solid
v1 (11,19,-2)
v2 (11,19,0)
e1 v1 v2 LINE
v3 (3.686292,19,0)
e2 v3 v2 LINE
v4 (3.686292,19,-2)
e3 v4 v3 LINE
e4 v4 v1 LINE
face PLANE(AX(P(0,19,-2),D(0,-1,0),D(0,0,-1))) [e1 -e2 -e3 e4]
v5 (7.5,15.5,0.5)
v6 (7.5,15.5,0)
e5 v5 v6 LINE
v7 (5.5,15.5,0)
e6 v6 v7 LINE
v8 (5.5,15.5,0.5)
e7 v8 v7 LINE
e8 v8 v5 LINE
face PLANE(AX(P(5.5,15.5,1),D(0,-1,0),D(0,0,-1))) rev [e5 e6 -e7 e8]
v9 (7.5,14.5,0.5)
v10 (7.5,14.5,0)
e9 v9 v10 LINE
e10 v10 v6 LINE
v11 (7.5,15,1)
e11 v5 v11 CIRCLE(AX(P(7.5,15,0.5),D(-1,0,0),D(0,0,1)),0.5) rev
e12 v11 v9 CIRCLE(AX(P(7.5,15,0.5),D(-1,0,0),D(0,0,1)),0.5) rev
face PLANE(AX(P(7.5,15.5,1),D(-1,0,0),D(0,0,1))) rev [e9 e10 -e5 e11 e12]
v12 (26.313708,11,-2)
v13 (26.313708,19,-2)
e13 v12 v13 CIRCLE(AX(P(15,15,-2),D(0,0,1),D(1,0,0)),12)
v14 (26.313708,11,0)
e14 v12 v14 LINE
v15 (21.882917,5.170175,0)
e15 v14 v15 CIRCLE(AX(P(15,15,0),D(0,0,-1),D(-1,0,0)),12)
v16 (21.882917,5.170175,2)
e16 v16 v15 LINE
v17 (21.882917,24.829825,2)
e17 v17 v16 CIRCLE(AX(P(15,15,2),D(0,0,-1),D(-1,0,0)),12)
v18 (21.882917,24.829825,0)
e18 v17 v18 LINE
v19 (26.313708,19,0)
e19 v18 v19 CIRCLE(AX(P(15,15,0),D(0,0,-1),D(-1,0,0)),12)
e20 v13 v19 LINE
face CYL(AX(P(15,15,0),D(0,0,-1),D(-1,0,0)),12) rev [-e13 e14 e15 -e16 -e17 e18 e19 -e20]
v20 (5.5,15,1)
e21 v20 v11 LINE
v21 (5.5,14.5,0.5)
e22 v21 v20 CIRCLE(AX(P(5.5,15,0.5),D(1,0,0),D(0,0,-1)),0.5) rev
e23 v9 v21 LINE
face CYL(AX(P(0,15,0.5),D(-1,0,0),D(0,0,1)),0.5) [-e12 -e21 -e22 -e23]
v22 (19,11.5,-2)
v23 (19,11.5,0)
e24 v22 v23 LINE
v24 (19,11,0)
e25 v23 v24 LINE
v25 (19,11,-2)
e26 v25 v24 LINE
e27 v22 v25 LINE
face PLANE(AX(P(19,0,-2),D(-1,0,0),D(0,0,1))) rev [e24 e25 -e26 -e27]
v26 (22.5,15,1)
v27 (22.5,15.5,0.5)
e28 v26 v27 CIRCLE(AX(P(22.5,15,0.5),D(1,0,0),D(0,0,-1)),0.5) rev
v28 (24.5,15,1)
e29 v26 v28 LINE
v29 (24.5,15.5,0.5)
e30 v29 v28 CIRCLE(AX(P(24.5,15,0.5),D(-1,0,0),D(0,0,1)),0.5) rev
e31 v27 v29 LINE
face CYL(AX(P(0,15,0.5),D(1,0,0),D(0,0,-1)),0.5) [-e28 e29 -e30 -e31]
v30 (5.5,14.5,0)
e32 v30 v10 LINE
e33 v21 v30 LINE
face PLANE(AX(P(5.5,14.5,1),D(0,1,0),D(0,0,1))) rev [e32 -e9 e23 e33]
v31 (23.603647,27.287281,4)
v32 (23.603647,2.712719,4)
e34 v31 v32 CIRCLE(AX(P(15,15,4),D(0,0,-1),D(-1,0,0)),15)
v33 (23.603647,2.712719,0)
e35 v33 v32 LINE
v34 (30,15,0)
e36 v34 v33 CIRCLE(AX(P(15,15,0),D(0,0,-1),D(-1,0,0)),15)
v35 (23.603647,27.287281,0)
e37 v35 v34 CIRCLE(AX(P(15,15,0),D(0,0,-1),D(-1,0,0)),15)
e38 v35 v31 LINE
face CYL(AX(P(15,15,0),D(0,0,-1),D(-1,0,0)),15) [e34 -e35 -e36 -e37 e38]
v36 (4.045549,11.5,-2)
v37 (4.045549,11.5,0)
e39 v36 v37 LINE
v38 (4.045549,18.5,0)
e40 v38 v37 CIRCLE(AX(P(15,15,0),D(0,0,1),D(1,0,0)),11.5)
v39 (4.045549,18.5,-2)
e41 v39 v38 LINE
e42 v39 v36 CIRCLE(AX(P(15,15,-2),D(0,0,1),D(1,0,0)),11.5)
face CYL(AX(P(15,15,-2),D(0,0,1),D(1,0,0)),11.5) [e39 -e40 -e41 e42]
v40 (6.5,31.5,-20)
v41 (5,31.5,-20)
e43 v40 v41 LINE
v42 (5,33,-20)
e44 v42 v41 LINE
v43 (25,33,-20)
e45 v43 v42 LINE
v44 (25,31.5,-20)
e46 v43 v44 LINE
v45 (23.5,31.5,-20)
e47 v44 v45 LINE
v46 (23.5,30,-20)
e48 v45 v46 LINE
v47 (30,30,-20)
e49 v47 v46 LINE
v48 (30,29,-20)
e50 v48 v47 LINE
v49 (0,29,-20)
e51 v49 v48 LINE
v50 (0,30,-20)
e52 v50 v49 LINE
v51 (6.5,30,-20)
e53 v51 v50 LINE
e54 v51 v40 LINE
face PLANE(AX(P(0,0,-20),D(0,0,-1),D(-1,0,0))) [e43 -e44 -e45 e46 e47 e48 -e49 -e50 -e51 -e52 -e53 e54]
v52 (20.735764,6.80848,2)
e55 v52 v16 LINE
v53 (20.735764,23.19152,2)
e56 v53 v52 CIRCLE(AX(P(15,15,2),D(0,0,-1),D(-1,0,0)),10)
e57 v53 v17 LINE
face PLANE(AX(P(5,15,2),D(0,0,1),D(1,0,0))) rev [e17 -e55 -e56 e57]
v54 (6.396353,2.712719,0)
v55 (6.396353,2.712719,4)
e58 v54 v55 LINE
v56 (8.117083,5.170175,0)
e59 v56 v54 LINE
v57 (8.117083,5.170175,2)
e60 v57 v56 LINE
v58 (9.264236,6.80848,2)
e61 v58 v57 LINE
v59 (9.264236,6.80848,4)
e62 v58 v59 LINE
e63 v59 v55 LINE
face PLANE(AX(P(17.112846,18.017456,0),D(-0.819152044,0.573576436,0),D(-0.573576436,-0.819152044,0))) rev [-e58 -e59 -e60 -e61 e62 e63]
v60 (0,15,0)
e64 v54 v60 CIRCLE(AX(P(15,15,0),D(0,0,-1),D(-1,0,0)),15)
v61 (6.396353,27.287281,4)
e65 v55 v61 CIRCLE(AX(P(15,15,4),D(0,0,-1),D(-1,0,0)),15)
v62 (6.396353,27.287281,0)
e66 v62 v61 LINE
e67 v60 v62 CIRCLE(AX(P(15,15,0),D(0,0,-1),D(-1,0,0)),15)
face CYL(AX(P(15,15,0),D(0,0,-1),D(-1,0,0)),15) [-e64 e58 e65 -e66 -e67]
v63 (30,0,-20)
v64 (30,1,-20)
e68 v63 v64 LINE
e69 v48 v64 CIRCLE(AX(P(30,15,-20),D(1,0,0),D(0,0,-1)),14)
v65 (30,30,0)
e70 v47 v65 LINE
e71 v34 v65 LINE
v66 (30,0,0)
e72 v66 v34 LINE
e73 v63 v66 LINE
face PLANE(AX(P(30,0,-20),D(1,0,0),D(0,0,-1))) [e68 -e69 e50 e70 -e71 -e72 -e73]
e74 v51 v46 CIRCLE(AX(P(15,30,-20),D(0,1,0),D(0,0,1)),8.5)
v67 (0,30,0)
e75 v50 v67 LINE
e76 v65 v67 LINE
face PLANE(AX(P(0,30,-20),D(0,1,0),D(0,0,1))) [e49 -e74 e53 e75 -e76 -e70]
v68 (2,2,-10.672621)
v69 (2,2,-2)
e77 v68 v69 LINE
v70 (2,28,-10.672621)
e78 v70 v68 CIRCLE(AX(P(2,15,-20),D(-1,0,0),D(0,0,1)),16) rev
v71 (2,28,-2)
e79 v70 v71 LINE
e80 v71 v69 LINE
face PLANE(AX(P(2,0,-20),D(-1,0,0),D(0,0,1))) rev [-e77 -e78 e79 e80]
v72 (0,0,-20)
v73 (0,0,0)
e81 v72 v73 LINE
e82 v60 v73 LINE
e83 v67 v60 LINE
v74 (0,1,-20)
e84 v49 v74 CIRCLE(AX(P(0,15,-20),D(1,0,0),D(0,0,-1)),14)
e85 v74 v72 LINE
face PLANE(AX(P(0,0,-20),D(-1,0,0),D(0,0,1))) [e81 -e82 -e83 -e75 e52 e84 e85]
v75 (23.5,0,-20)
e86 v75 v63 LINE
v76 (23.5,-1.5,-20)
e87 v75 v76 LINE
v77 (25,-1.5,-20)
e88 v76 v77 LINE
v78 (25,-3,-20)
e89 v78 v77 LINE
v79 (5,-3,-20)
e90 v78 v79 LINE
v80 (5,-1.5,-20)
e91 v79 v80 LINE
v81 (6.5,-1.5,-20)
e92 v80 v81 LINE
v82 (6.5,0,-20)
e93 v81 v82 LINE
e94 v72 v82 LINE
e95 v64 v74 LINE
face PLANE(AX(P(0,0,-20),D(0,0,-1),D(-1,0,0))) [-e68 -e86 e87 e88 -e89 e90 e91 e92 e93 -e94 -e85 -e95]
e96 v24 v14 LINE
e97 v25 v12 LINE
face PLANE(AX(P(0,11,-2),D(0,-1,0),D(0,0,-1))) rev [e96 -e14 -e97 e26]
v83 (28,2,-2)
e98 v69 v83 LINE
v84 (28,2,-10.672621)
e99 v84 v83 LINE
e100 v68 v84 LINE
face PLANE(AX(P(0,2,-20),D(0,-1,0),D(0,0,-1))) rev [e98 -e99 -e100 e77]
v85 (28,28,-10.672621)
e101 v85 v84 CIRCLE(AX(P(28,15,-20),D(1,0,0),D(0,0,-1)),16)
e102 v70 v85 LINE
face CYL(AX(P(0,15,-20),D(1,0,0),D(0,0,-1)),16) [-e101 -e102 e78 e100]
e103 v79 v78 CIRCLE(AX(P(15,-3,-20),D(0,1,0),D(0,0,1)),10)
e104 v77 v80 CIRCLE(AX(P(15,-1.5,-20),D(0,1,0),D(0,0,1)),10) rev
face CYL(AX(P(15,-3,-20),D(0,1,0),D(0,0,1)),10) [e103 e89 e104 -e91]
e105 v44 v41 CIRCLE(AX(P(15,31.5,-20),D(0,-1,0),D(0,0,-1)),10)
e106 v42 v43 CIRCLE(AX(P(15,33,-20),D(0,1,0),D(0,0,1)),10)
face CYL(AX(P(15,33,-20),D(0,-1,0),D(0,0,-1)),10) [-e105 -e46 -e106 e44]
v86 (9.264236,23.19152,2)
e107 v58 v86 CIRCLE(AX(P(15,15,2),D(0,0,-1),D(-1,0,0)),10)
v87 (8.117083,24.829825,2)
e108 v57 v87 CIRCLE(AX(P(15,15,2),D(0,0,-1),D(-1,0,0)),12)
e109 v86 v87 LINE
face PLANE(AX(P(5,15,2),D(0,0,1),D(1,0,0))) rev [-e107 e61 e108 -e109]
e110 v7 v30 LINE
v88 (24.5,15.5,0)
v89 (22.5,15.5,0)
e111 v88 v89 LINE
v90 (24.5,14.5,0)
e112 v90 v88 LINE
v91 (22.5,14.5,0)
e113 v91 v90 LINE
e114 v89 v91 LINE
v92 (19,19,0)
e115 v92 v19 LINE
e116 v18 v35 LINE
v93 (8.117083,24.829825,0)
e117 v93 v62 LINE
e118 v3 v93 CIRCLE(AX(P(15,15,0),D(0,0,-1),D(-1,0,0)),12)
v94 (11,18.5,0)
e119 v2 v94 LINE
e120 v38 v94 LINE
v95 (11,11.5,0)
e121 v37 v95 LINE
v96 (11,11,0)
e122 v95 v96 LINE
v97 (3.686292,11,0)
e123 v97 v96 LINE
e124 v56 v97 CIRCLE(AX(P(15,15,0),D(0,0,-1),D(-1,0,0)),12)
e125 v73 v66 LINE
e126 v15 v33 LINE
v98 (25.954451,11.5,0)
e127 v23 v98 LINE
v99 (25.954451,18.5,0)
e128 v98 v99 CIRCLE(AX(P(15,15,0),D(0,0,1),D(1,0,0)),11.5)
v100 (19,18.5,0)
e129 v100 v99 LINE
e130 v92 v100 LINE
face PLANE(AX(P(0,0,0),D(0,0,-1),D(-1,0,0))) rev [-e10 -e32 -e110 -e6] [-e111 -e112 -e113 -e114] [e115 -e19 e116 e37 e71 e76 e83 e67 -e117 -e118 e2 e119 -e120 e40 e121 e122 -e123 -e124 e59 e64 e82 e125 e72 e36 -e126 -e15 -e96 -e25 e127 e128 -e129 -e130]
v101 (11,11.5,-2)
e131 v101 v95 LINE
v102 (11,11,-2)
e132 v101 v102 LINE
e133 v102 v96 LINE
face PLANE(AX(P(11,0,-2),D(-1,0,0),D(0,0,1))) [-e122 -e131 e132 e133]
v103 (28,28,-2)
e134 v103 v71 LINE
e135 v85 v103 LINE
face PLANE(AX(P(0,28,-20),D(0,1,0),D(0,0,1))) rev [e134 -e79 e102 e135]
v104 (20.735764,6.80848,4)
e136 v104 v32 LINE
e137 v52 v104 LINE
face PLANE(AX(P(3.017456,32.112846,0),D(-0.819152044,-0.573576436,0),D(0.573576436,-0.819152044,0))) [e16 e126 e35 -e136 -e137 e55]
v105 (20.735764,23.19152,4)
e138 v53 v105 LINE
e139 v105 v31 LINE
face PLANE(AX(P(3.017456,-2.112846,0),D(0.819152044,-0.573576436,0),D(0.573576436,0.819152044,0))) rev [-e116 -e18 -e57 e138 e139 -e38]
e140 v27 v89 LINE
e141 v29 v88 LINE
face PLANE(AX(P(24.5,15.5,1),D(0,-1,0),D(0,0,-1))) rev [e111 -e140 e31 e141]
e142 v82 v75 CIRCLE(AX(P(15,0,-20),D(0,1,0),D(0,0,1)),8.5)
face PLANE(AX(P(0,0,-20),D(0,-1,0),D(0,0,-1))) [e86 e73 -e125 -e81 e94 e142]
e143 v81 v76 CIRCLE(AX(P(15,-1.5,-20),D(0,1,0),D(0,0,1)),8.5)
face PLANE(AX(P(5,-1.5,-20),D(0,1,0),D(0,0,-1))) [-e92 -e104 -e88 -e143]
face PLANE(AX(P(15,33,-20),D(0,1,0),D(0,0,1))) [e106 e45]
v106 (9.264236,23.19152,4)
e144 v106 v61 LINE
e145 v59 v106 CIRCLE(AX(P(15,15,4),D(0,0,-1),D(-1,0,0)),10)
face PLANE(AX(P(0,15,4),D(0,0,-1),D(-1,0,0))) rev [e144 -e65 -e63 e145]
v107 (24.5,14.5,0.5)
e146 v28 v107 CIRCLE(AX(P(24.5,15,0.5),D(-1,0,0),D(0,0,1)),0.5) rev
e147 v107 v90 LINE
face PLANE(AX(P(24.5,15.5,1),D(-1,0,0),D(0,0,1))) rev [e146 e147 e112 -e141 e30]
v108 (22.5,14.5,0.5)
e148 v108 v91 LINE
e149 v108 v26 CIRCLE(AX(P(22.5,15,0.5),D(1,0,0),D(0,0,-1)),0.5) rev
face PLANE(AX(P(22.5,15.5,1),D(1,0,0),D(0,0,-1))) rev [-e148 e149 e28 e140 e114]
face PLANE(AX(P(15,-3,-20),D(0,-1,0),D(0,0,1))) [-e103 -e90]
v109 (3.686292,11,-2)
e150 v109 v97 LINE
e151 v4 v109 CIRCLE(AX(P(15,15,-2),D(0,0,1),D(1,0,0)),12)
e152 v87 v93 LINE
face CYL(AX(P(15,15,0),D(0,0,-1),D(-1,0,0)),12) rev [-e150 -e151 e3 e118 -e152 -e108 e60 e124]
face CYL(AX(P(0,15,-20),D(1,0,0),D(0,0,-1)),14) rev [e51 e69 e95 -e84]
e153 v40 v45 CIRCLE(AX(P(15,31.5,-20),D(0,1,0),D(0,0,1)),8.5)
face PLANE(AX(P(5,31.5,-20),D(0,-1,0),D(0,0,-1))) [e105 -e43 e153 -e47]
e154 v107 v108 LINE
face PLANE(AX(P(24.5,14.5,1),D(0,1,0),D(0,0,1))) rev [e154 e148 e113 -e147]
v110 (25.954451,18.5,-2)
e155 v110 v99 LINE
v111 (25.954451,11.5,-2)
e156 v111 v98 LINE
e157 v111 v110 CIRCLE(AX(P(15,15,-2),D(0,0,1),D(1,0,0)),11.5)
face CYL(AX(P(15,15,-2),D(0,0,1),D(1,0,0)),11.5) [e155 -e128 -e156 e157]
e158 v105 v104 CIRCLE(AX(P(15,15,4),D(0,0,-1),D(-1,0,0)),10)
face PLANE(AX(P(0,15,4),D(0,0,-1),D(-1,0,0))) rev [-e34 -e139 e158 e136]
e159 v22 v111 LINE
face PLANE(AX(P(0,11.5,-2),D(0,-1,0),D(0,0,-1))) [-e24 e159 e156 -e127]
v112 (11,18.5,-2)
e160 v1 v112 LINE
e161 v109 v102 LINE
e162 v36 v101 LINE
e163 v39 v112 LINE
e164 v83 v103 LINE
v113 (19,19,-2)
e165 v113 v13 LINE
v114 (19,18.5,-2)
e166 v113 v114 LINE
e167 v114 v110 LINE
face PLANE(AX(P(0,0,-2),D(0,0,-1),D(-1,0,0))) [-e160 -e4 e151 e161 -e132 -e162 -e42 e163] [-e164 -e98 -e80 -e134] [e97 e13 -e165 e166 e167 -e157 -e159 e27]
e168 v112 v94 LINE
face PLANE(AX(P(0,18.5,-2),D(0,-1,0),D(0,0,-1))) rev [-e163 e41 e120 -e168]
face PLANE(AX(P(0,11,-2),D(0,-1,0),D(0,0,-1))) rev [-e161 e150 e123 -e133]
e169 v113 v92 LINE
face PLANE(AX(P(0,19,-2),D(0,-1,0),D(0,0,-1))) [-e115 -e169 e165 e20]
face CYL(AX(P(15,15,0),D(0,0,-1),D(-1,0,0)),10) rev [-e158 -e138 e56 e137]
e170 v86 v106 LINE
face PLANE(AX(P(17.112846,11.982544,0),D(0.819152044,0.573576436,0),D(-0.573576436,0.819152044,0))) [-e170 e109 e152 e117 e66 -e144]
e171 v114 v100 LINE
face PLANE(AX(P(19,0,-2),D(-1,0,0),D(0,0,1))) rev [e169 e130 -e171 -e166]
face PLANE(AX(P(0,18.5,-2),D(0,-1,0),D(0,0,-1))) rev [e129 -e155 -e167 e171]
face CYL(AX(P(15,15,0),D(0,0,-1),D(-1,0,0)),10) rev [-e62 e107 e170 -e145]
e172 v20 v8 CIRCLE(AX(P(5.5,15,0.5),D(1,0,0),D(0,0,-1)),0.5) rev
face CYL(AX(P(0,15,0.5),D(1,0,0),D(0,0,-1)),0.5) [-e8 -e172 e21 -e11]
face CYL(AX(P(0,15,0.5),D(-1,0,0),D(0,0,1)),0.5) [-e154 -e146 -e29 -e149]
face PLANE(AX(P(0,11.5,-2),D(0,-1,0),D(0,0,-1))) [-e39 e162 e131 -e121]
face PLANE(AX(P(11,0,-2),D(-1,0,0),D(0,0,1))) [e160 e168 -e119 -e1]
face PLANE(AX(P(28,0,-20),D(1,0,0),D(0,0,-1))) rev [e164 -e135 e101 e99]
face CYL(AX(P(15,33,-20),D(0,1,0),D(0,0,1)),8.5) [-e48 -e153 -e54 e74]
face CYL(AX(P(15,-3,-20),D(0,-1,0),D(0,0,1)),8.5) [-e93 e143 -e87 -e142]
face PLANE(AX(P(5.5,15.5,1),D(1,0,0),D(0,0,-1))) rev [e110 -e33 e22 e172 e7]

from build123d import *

# Parameters (mm, degrees)
SKETCH4_W           = 30
SKETCH4_H           = 30
BOSS_EXTRUDE2_DEPTH = 20
SKETCH5_R           = 14
CUT_EXTRUDE1_DEPTH  = 47.904157598
SKETCH6_W           = 2
SKETCH6_H           = 1
BOSS_EXTRUDE3_DEPTH = 1
SHELL6_START        = 2
SHELL6_DEPTH        = 26
FILLET1_R           = 0.5
CUT_EXTRUDE2_DEPTH  = 4
CUT_EXTRUDE11_START = -2
CUT_EXTRUDE11_DEPTH = 2
BOSS_EXTRUDE4_DEPTH = 3
SKETCH12_W          = 1.5
SKETCH12_H          = 1.5


# Read off the part's stored shape, not the designer's step: Shell6
with BuildPart() as part:
    # Sketch4 → Boss-Extrude2 (new body)
    with BuildSketch(Plane.XY):
        with Locations((15, 15)):
            Rectangle(SKETCH4_W, SKETCH4_H)
    extrude(amount=-BOSS_EXTRUDE2_DEPTH)

    # Sketch5 → Cut-Extrude1 (cut, through all)
    with BuildSketch(Plane(origin=(30, 0, 0), x_dir=(0, 0, -1), z_dir=(1, 0, 0))):
        with Locations((20, 15)):
            Circle(SKETCH5_R)
    extrude(amount=-CUT_EXTRUDE1_DEPTH, mode=Mode.SUBTRACT)

    # Sketch6 → Boss-Extrude3 (add)
    with BuildSketch(Plane.XY):
        with Locations((23.5, 15)):
            Rectangle(SKETCH6_W, SKETCH6_H)
        with Locations((6.5, 15)):
            Rectangle(SKETCH6_W, SKETCH6_H)
    extrude(amount=BOSS_EXTRUDE3_DEPTH)

    # Shell6 outline → Shell6 (cut)
    with BuildSketch(Plane.YZ.offset(SHELL6_START)):
        with BuildLine():
            Line((28, -2), (2, -2))
            Line((2, -2), (2, -10.672620947))
            ThreePointArc((2, -10.672620947), (15, -4), (28, -10.672620947))
            Line((28, -10.672620947), (28, -2))
        make_face()
    extrude(amount=SHELL6_DEPTH, mode=Mode.SUBTRACT)

    # Fillet1
    fillet1_edges = [part.edges().sort_by_distance(p)[0] for p in [
        (23.5, 15.5, 1),
        (23.5, 14.5, 1),
        (6.5, 15.5, 1),
        (6.5, 14.5, 1),
    ]]
    fillet(fillet1_edges, radius=FILLET1_R - 0.0001)  # a hair under: the kernel refuses the full size

    # Sketch7 → Revolve1 (revolve)
    with BuildSketch(Plane(origin=(0, 15, 0), x_dir=(-1, 0, 0), z_dir=(0, -1, 0))):
        Polygon((0, 0), (0, -4), (-5, -4), (-5, -2), (-3, -2), (-3, 0), align=None)
    revolve(axis=Axis((15, 15, 0), (0, 0, 1)))

    # Sketch9 → Cut-Extrude2 (cut)
    with BuildSketch(Plane.XY.offset(4)):
        with BuildLine():
            Line((6.396353455, 27.287280664), (9.264235636, 23.191520443))
            ThreePointArc((9.264235636, 23.191520443), (15, 25), (20.735764364, 23.191520443))
            Line((20.735764364, 23.191520443), (23.603646545, 27.287280664))
            ThreePointArc((23.603646545, 27.287280664), (15, 30), (6.396353455, 27.287280664))
        make_face()
    cut_extrude2 = extrude(amount=-CUT_EXTRUDE2_DEPTH, mode=Mode.SUBTRACT)

    # Mirror1: Cut-Extrude2 across plane
    add(cut_extrude2.mirror(Plane(origin=(0, 15, 0), x_dir=(0, 0, 1), z_dir=(0, -1, 0))), mode=Mode.SUBTRACT)

    # Sketch10 → Cut-Extrude11 (cut)
    with BuildSketch(Plane.XY.offset(CUT_EXTRUDE11_START)):
        with BuildLine():
            Line((11, 19), (3.686291501, 19))
            ThreePointArc((3.686291501, 19), (3, 15), (3.686291501, 11))
            Line((3.686291501, 11), (11, 11))
            Line((11, 11), (11, 11.5))
            Line((11, 11.5), (4.04554885, 11.5))
            ThreePointArc((4.04554885, 11.5), (3.5, 15), (4.04554885, 18.5))
            Line((4.04554885, 18.5), (11, 18.5))
            Line((11, 18.5), (11, 19))
        make_face()
        with BuildLine():
            Line((26.313708499, 19), (19, 19))
            Line((19, 19), (19, 18.5))
            Line((19, 18.5), (25.95445115, 18.5))
            ThreePointArc((25.95445115, 18.5), (26.5, 15), (25.95445115, 11.5))
            Line((25.95445115, 11.5), (19, 11.5))
            Line((19, 11.5), (19, 11))
            Line((19, 11), (26.313708499, 11))
            ThreePointArc((26.313708499, 11), (27, 15), (26.313708499, 19))
        make_face()
    extrude(amount=CUT_EXTRUDE11_DEPTH, mode=Mode.SUBTRACT)

    # Sketch11 → Boss-Extrude4 (add)
    with BuildSketch(Plane(origin=(0, 30, 0), x_dir=(1, 0, 0), z_dir=(0, 1, 0))):
        with BuildLine():
            Line((25, 20), (5, 20))
            ThreePointArc((5, 20), (15, 10), (25, 20))
        make_face()
    boss_extrude4 = extrude(amount=BOSS_EXTRUDE4_DEPTH)

    # Sketch12 → Cut-Revolve1 (revolve, cut)
    with BuildSketch(Plane(origin=(0, 0, -20), x_dir=(-1, 0, 0), z_dir=(0, 0, -1))):
        with Locations((-5.75, 30.75)):
            Rectangle(SKETCH12_W, SKETCH12_H)
    cut_revolve1 = revolve(axis=Axis((15, 33, -20), (0, -1, 0)), mode=Mode.SUBTRACT)

    # Mirror2: Boss-Extrude4, Cut-Revolve1 across plane
    add(boss_extrude4.mirror(Plane(origin=(0, 15, 0), x_dir=(0, 0, 1), z_dir=(0, -1, 0))))
    add(cut_revolve1.mirror(Plane(origin=(0, 15, 0), x_dir=(0, 0, 1), z_dir=(0, -1, 0))), mode=Mode.SUBTRACT)


solid = part.part
